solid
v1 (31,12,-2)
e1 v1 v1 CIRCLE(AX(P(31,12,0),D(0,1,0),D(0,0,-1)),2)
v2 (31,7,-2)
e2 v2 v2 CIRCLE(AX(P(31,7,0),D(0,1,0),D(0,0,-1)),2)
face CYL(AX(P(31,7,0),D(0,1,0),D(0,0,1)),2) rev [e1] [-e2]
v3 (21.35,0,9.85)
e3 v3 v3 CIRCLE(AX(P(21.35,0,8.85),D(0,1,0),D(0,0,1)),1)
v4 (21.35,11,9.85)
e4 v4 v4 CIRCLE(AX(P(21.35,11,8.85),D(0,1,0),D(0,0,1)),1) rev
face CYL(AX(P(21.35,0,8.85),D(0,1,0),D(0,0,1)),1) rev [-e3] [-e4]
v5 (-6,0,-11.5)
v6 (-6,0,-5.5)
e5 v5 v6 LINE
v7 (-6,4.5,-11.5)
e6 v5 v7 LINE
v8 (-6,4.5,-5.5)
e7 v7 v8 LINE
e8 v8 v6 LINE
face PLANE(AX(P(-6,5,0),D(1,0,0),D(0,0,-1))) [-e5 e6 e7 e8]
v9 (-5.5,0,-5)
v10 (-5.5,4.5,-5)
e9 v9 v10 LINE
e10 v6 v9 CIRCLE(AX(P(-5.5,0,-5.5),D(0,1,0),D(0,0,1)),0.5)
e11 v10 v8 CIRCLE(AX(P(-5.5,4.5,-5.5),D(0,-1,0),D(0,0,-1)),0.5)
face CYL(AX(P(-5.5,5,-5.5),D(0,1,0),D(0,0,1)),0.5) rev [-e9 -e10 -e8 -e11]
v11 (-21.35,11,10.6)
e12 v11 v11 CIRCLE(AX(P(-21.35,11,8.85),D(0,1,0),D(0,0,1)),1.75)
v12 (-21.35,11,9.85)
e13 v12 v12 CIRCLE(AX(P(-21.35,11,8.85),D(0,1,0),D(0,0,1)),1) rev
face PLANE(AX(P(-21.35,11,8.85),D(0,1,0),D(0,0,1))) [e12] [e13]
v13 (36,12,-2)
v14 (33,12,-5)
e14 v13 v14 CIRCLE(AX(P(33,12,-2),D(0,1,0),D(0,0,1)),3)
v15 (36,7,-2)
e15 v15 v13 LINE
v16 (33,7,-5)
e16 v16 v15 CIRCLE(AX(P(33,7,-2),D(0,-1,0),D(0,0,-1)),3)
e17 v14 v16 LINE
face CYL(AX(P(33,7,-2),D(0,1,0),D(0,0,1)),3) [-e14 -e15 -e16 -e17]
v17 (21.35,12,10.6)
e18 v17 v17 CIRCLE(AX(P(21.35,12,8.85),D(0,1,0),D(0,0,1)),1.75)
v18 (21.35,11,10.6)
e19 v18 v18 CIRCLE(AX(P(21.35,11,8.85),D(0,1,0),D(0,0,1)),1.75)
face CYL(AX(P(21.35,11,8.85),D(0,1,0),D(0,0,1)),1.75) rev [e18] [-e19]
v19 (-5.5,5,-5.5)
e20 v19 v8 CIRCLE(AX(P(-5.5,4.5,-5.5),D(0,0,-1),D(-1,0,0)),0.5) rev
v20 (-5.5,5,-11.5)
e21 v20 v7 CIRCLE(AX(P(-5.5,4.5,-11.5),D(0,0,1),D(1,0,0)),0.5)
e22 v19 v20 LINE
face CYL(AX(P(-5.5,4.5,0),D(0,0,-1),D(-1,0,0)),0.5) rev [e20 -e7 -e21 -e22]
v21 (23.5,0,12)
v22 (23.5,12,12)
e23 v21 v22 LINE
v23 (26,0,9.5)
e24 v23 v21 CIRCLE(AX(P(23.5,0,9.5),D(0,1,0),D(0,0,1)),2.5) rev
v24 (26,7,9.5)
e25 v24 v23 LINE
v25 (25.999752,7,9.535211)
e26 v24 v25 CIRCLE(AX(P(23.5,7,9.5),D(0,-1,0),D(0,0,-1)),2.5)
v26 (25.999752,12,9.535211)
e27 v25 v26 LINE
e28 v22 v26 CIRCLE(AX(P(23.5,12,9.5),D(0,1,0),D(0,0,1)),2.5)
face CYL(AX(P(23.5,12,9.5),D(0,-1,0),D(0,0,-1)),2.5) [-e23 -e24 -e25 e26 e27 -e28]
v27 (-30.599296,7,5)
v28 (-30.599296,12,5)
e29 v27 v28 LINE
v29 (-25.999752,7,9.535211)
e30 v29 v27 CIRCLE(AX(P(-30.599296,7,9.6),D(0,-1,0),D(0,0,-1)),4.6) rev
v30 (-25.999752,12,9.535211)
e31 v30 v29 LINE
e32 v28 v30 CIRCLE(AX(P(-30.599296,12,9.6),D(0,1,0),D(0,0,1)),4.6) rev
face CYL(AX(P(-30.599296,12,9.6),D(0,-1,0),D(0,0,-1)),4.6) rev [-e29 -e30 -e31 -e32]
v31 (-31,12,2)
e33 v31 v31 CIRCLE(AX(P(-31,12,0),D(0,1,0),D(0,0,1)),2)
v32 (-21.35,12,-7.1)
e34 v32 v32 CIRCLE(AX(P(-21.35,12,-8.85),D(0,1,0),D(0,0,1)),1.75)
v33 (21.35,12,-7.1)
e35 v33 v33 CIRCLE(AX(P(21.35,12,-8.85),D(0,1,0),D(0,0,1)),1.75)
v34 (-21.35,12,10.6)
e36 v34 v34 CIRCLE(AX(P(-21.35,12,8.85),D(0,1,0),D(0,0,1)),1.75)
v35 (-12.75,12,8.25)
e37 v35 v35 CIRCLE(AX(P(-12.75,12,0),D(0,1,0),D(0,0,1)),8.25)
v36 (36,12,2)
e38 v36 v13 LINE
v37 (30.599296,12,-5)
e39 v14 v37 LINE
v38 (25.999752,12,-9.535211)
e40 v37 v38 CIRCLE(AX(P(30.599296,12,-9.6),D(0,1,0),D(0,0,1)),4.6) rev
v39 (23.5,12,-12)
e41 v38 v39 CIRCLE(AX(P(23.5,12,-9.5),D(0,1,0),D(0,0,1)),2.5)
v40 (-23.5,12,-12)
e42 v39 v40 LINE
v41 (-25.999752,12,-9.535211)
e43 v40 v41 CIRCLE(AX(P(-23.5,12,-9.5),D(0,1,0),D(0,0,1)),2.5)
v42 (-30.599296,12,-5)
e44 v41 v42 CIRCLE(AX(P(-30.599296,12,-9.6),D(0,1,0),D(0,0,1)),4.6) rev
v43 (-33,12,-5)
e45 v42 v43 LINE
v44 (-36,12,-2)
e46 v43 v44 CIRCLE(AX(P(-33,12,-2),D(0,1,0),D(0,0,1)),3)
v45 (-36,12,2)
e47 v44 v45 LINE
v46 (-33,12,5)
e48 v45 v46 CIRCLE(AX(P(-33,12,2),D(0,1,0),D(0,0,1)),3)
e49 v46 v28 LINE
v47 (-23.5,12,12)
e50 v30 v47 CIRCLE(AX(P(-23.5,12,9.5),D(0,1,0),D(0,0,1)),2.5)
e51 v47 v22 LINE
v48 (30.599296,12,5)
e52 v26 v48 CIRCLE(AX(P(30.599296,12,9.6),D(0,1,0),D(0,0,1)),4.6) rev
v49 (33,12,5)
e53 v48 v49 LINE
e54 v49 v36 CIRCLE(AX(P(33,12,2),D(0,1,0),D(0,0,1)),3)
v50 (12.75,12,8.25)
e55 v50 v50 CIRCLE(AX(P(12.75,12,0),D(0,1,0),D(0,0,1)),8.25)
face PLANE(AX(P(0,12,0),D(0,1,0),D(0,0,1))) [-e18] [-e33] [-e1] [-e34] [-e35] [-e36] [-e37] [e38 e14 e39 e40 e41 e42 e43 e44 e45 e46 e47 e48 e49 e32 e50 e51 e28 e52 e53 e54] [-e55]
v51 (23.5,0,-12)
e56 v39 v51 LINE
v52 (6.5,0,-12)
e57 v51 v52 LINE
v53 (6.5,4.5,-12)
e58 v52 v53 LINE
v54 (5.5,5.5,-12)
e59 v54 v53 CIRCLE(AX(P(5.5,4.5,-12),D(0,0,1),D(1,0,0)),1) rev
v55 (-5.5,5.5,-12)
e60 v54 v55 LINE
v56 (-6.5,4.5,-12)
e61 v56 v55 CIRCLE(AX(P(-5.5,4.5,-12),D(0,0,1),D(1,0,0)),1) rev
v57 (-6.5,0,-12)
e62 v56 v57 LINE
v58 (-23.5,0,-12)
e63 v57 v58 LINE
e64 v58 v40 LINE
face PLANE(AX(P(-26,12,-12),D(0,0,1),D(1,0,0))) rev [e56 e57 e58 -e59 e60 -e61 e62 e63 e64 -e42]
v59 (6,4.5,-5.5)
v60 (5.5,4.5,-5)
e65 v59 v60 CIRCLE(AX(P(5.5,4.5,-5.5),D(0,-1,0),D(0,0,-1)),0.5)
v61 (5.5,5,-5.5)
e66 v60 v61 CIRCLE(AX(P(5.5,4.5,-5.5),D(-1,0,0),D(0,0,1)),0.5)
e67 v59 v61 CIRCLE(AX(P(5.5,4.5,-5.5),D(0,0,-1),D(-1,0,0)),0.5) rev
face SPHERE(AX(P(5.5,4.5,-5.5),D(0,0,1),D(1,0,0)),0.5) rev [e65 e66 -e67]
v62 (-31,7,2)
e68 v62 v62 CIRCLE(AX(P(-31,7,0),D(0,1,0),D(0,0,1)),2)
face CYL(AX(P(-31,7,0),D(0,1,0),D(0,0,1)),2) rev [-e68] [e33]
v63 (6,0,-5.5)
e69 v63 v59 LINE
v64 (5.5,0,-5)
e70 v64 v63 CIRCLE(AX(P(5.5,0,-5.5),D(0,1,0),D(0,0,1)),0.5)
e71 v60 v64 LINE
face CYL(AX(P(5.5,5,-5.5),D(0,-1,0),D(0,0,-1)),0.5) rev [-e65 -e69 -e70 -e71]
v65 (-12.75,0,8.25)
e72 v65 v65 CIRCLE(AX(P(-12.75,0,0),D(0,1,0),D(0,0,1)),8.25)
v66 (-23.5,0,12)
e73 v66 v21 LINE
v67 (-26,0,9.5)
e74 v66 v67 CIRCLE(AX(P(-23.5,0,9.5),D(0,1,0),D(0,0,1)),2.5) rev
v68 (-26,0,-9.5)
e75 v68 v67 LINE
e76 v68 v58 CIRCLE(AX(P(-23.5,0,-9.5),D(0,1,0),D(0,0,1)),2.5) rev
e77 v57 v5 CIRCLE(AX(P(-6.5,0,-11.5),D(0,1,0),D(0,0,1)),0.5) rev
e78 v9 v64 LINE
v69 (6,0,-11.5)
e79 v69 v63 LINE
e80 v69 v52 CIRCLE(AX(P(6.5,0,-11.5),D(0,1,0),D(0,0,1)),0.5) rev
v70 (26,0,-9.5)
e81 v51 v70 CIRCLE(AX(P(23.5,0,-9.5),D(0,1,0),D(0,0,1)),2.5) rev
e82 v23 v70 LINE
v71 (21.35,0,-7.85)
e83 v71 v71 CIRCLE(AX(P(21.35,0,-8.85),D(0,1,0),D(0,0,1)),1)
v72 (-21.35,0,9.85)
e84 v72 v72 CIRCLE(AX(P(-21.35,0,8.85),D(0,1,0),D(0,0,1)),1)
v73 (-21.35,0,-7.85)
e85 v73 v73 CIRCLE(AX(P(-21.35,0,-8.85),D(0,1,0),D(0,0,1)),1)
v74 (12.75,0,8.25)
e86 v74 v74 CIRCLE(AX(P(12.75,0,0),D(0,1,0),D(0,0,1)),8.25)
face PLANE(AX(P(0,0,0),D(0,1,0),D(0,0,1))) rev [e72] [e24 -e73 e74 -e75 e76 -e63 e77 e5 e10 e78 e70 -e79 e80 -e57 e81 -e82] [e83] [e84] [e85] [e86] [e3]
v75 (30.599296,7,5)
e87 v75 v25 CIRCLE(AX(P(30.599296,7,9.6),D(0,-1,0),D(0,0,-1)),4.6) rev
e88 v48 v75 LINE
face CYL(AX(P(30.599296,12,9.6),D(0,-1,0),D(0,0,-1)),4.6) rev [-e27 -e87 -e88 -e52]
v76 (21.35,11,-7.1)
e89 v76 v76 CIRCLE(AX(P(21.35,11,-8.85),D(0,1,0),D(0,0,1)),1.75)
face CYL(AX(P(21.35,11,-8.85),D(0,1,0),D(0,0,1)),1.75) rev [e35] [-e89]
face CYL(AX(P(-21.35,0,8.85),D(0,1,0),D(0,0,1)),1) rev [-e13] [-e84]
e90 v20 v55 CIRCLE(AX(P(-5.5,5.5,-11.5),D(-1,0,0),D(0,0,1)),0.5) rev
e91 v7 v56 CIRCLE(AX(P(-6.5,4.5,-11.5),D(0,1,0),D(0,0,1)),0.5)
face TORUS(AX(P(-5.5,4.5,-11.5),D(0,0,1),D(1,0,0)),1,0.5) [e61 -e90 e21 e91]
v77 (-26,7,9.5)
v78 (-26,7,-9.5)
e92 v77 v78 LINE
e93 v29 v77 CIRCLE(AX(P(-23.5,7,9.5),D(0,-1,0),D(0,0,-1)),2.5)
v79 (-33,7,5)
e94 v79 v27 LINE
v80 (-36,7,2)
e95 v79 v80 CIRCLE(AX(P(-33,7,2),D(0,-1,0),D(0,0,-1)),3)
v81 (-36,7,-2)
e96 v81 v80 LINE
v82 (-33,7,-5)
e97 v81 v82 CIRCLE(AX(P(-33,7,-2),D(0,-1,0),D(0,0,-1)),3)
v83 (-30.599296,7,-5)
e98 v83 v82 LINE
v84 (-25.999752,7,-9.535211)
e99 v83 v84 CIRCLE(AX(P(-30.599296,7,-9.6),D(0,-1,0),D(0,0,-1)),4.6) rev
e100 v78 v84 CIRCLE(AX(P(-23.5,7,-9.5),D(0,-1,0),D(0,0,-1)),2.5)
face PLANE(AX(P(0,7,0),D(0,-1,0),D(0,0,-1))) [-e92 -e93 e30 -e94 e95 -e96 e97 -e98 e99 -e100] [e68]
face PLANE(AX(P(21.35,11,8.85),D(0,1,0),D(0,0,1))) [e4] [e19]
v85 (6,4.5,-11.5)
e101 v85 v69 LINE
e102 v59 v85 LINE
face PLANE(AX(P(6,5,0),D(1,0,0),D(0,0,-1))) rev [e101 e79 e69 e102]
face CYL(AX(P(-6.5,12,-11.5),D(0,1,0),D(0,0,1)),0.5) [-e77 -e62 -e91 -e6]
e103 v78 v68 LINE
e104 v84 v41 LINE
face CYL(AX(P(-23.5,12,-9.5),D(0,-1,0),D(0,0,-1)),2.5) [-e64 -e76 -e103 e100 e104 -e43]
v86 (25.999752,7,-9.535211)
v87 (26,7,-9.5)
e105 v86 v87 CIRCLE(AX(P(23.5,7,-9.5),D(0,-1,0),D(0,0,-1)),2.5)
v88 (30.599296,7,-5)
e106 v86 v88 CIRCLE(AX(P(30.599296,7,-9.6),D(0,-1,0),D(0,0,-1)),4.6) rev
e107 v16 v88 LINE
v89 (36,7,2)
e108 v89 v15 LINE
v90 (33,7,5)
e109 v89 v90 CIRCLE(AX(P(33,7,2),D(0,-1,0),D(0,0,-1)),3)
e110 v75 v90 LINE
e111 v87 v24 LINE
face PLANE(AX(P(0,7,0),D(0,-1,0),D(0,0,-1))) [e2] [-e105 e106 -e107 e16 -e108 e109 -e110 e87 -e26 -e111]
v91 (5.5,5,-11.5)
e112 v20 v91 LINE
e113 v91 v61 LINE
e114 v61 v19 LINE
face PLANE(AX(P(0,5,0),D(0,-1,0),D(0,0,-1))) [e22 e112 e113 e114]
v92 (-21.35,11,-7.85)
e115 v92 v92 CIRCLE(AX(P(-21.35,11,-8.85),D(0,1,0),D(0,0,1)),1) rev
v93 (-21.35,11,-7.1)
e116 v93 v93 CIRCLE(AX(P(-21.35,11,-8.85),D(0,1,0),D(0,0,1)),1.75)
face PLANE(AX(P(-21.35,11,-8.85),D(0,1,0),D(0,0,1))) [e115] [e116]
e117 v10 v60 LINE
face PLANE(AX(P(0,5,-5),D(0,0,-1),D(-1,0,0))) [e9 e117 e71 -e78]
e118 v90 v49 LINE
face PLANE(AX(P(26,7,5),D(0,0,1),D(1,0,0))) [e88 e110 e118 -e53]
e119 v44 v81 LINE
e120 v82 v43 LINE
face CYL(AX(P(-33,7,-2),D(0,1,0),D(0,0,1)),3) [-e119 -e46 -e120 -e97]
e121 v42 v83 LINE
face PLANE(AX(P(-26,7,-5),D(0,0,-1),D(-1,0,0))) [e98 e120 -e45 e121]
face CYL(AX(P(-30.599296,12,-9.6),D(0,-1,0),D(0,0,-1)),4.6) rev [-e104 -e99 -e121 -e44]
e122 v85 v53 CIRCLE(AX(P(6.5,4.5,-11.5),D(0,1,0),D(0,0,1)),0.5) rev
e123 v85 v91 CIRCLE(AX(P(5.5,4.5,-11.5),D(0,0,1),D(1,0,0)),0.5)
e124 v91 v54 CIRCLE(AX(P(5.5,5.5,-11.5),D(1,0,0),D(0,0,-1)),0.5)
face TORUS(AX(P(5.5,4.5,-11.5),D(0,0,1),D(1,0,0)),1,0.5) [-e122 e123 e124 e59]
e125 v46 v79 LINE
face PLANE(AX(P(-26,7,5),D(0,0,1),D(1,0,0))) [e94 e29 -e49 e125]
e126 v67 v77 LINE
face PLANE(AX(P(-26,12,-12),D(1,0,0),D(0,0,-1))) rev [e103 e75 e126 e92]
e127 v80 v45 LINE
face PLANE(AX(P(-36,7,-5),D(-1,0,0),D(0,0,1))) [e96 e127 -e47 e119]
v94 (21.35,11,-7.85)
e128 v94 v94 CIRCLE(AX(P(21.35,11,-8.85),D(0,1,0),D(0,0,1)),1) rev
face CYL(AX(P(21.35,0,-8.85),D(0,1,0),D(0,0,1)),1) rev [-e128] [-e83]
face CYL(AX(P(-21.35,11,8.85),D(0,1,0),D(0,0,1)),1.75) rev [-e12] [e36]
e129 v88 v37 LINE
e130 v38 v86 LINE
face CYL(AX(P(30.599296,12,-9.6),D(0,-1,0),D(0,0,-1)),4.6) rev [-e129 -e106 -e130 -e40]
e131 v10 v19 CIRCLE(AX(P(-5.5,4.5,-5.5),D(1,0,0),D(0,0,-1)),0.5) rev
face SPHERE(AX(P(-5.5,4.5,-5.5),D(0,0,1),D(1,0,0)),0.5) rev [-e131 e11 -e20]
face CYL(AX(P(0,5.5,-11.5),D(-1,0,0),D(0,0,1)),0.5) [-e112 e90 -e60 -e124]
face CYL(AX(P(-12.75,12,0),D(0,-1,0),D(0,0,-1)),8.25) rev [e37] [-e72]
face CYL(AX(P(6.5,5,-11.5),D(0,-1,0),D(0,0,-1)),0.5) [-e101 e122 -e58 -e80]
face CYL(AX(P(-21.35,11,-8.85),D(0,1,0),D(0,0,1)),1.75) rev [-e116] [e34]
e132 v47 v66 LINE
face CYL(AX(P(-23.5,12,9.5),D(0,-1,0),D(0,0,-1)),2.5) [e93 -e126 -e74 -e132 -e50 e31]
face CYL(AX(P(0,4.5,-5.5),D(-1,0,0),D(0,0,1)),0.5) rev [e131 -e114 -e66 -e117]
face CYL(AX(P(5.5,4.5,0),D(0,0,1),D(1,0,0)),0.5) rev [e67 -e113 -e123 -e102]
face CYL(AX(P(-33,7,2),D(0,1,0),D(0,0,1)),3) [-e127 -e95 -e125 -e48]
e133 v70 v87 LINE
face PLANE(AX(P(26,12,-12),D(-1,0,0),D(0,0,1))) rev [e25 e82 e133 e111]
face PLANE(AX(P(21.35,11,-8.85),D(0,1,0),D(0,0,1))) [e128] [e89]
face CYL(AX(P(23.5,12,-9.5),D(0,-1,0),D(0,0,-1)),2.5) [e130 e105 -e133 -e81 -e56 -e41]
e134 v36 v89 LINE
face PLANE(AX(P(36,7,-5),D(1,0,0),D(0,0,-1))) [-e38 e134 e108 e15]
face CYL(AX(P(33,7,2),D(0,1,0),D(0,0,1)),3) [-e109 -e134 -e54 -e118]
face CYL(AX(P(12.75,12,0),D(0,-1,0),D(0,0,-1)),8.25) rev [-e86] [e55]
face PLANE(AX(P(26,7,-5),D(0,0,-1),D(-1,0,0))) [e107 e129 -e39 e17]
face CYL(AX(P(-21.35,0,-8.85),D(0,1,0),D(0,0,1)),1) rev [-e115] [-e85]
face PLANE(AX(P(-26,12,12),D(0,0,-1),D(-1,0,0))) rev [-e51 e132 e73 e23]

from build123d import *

# Parameters (mm, degrees)
SKETCH1_W           = 52
SKETCH1_H           = 24
SKETCH1_R           = 8.25
BOSS_EXTRUDE1_DEPTH = 12
SKETCH2_R           = 1
CUT_EXTRUDE1_DEPTH  = 32.048349393
SKETCH3_R           = 1.75
CUT_EXTRUDE2_DEPTH  = 1
FILLET1_R           = 2.5
CUT_EXTRUDE3_DEPTH  = 5
FILLET2_R           = 0.5
SKETCH6_W           = 10
SKETCH6_H           = 10
SKETCH6_R           = 2
BOSS_EXTRUDE2_DEPTH = 5
FILLET3_R           = 4.6
FILLET4_R           = 3


with BuildPart() as part:
    # Sketch1 → Boss-Extrude1 (new body)
    with BuildSketch(Plane(origin=(0, 0, 0), x_dir=(1, 0, 0), z_dir=(0, 1, 0))):
        Rectangle(SKETCH1_W, SKETCH1_H)
        with Locations(Location((12.75, 0, 0), (0, 0, 270))):
            Circle(SKETCH1_R, mode=Mode.SUBTRACT)
        with Locations(Location((-12.75, 0, 0), (0, 0, 270))):
            Circle(SKETCH1_R, mode=Mode.SUBTRACT)
    extrude(amount=BOSS_EXTRUDE1_DEPTH)

    # Sketch2 → Cut-Extrude1 (cut, through all)
    with BuildSketch(Plane(origin=(0, 12, 0), x_dir=(1, 0, 0), z_dir=(0, 1, 0))):
        with Locations(Location((-21.35, 8.85, 0), (0, 0, 270))):
            Circle(SKETCH2_R)
        with Locations(Location((21.35, 8.85, 0), (0, 0, 270))):
            Circle(SKETCH2_R)
        with Locations(Location((21.35, -8.85, 0), (0, 0, 270))):
            Circle(SKETCH2_R)
        with Locations(Location((-21.35, -8.85, 0), (0, 0, 270))):
            Circle(SKETCH2_R)
    extrude(amount=-CUT_EXTRUDE1_DEPTH, mode=Mode.SUBTRACT)

    # Sketch3 → Cut-Extrude2 (cut)
    with BuildSketch(Plane(origin=(0, 12, 0), x_dir=(1, 0, 0), z_dir=(0, 1, 0))):
        with Locations(Location((-21.35, 8.85, 0), (0, 0, 270))):
            Circle(SKETCH3_R)
        with Locations(Location((21.35, 8.85, 0), (0, 0, 270))):
            Circle(SKETCH3_R)
        with Locations(Location((21.35, -8.85, 0), (0, 0, 270))):
            Circle(SKETCH3_R)
        with Locations(Location((-21.35, -8.85, 0), (0, 0, 270))):
            Circle(SKETCH3_R)
    extrude(amount=-CUT_EXTRUDE2_DEPTH, mode=Mode.SUBTRACT)

    # Fillet1
    fillet1_edges = [part.edges().sort_by_distance(p)[0] for p in [
        (26, 6, 12),
        (-26, 6, 12),
        (-26, 6, -12),
        (26, 6, -12),
    ]]
    fillet(fillet1_edges, radius=FILLET1_R)

    # Sketch4 → Cut-Extrude3 (cut)
    with BuildSketch(Plane.XZ):
        Polygon((-6, -5), (-6, -12), (6, -12), (6, -5), (0, -5), align=None)
    extrude(amount=-CUT_EXTRUDE3_DEPTH, mode=Mode.SUBTRACT)

    # Fillet2
    fillet2_edges = [part.edges().sort_by_distance(p)[0] for p in [
        (0, 5, -12),
        (6, 2.5, -12),
        (-6, 2.5, -12),
        (-6, 2.5, -5),
        (6, 5, -8.5),
        (6, 2.5, -5),
        (-6, 5, -8.5),
        (0, 5, -5),
    ]]
    fillet(fillet2_edges, radius=FILLET2_R)

    # Sketch6 → Boss-Extrude2 (add)
    # profile 1 of 2: a face of its own
    with BuildSketch(Plane(origin=(0, 12, 0), x_dir=(1, 0, 0), z_dir=(0, 1, 0))):
        with Locations((-31, 0)):
            Rectangle(SKETCH6_W, SKETCH6_H)
        with Locations(Location((-31, 0, 0), (0, 0, 270))):
            Circle(SKETCH6_R, mode=Mode.SUBTRACT)
    # profile 2 of 2: a face of its own
    with BuildSketch(Plane(origin=(0, 12, 0), x_dir=(1, 0, 0), z_dir=(0, 1, 0))):
        with Locations((31, 0)):
            Rectangle(SKETCH6_W, SKETCH6_H)
        with Locations(Location((31, 0, 0), (0, 0, 90))):
            Circle(SKETCH6_R, mode=Mode.SUBTRACT)
    extrude(amount=-BOSS_EXTRUDE2_DEPTH)

    # Fillet3
    # the kernel refuses this fillet: 4.6 mm, written as the material it adds along each edge
    with BuildSketch(Plane(origin=(26, 12, 5), x_dir=(-5.467859312132584e-05, 0, 0.9999999985051258), z_dir=(0, -1, 0)), Plane(origin=(-26, 12, -5), x_dir=(5.467859312132586e-05, 0, -0.9999999985051258), z_dir=(0, -1, 0))) as fillet3_piece_1:
        with BuildLine():
            CenterArc((4.59974851, -4.599547254), FILLET3_R, 90.80387664, 89.192990507)
            Line((-0.000251483, -4.599295733), (-0.460251482, -4.599270581))
            Line((-0.460251482, -4.599270581), (-0.459999999, 2.5152e-05))
            Line((-0.459999999, 2.5152e-05), (2.5152e-05, 0.459999999))
            ThreePointArc((2.5152e-05, 0.459999999), (4.500025145, 0.459753946), (4.528757551, 0.459954725))
            Line((4.528757551, 0.459954725), (4.535211274, 0))
        make_face()
    extrude(amount=5)
    with BuildSketch(Plane(origin=(-26, 12, 5), x_dir=(5.467859312289258e-05, 0, 0.9999999985051258), z_dir=(0, -1, 0)), Plane(origin=(26, 12, -5), x_dir=(-5.467859312132581e-05, 0, -0.9999999985051258), z_dir=(0, -1, 0))) as fillet3_piece_2:
        with BuildLine():
            CenterArc((4.59974851, 4.599547254), FILLET3_R, 180.003132853, 89.192990507)
            Line((-0.000251483, 4.599295733), (-0.460251482, 4.599270581))
            Line((-0.460251482, 4.599270581), (-0.459999999, -2.5152e-05))
            Line((-0.459999999, -2.5152e-05), (2.5152e-05, -0.459999999))
            ThreePointArc((2.5152e-05, -0.459999999), (4.500025145, -0.459753946), (4.528757551, -0.459954725))
            Line((4.528757551, -0.459954725), (4.535211274, 0))
        make_face()
    extrude(amount=5)

    # Fillet4
    fillet4_edges = [part.edges().sort_by_distance(p)[0] for p in [
        (-36, 9.5, 5),
        (-36, 9.5, -5),
        (36, 9.5, -5),
        (36, 9.5, 5),
    ]]
    fillet(fillet4_edges, radius=FILLET4_R)


solid = part.part
